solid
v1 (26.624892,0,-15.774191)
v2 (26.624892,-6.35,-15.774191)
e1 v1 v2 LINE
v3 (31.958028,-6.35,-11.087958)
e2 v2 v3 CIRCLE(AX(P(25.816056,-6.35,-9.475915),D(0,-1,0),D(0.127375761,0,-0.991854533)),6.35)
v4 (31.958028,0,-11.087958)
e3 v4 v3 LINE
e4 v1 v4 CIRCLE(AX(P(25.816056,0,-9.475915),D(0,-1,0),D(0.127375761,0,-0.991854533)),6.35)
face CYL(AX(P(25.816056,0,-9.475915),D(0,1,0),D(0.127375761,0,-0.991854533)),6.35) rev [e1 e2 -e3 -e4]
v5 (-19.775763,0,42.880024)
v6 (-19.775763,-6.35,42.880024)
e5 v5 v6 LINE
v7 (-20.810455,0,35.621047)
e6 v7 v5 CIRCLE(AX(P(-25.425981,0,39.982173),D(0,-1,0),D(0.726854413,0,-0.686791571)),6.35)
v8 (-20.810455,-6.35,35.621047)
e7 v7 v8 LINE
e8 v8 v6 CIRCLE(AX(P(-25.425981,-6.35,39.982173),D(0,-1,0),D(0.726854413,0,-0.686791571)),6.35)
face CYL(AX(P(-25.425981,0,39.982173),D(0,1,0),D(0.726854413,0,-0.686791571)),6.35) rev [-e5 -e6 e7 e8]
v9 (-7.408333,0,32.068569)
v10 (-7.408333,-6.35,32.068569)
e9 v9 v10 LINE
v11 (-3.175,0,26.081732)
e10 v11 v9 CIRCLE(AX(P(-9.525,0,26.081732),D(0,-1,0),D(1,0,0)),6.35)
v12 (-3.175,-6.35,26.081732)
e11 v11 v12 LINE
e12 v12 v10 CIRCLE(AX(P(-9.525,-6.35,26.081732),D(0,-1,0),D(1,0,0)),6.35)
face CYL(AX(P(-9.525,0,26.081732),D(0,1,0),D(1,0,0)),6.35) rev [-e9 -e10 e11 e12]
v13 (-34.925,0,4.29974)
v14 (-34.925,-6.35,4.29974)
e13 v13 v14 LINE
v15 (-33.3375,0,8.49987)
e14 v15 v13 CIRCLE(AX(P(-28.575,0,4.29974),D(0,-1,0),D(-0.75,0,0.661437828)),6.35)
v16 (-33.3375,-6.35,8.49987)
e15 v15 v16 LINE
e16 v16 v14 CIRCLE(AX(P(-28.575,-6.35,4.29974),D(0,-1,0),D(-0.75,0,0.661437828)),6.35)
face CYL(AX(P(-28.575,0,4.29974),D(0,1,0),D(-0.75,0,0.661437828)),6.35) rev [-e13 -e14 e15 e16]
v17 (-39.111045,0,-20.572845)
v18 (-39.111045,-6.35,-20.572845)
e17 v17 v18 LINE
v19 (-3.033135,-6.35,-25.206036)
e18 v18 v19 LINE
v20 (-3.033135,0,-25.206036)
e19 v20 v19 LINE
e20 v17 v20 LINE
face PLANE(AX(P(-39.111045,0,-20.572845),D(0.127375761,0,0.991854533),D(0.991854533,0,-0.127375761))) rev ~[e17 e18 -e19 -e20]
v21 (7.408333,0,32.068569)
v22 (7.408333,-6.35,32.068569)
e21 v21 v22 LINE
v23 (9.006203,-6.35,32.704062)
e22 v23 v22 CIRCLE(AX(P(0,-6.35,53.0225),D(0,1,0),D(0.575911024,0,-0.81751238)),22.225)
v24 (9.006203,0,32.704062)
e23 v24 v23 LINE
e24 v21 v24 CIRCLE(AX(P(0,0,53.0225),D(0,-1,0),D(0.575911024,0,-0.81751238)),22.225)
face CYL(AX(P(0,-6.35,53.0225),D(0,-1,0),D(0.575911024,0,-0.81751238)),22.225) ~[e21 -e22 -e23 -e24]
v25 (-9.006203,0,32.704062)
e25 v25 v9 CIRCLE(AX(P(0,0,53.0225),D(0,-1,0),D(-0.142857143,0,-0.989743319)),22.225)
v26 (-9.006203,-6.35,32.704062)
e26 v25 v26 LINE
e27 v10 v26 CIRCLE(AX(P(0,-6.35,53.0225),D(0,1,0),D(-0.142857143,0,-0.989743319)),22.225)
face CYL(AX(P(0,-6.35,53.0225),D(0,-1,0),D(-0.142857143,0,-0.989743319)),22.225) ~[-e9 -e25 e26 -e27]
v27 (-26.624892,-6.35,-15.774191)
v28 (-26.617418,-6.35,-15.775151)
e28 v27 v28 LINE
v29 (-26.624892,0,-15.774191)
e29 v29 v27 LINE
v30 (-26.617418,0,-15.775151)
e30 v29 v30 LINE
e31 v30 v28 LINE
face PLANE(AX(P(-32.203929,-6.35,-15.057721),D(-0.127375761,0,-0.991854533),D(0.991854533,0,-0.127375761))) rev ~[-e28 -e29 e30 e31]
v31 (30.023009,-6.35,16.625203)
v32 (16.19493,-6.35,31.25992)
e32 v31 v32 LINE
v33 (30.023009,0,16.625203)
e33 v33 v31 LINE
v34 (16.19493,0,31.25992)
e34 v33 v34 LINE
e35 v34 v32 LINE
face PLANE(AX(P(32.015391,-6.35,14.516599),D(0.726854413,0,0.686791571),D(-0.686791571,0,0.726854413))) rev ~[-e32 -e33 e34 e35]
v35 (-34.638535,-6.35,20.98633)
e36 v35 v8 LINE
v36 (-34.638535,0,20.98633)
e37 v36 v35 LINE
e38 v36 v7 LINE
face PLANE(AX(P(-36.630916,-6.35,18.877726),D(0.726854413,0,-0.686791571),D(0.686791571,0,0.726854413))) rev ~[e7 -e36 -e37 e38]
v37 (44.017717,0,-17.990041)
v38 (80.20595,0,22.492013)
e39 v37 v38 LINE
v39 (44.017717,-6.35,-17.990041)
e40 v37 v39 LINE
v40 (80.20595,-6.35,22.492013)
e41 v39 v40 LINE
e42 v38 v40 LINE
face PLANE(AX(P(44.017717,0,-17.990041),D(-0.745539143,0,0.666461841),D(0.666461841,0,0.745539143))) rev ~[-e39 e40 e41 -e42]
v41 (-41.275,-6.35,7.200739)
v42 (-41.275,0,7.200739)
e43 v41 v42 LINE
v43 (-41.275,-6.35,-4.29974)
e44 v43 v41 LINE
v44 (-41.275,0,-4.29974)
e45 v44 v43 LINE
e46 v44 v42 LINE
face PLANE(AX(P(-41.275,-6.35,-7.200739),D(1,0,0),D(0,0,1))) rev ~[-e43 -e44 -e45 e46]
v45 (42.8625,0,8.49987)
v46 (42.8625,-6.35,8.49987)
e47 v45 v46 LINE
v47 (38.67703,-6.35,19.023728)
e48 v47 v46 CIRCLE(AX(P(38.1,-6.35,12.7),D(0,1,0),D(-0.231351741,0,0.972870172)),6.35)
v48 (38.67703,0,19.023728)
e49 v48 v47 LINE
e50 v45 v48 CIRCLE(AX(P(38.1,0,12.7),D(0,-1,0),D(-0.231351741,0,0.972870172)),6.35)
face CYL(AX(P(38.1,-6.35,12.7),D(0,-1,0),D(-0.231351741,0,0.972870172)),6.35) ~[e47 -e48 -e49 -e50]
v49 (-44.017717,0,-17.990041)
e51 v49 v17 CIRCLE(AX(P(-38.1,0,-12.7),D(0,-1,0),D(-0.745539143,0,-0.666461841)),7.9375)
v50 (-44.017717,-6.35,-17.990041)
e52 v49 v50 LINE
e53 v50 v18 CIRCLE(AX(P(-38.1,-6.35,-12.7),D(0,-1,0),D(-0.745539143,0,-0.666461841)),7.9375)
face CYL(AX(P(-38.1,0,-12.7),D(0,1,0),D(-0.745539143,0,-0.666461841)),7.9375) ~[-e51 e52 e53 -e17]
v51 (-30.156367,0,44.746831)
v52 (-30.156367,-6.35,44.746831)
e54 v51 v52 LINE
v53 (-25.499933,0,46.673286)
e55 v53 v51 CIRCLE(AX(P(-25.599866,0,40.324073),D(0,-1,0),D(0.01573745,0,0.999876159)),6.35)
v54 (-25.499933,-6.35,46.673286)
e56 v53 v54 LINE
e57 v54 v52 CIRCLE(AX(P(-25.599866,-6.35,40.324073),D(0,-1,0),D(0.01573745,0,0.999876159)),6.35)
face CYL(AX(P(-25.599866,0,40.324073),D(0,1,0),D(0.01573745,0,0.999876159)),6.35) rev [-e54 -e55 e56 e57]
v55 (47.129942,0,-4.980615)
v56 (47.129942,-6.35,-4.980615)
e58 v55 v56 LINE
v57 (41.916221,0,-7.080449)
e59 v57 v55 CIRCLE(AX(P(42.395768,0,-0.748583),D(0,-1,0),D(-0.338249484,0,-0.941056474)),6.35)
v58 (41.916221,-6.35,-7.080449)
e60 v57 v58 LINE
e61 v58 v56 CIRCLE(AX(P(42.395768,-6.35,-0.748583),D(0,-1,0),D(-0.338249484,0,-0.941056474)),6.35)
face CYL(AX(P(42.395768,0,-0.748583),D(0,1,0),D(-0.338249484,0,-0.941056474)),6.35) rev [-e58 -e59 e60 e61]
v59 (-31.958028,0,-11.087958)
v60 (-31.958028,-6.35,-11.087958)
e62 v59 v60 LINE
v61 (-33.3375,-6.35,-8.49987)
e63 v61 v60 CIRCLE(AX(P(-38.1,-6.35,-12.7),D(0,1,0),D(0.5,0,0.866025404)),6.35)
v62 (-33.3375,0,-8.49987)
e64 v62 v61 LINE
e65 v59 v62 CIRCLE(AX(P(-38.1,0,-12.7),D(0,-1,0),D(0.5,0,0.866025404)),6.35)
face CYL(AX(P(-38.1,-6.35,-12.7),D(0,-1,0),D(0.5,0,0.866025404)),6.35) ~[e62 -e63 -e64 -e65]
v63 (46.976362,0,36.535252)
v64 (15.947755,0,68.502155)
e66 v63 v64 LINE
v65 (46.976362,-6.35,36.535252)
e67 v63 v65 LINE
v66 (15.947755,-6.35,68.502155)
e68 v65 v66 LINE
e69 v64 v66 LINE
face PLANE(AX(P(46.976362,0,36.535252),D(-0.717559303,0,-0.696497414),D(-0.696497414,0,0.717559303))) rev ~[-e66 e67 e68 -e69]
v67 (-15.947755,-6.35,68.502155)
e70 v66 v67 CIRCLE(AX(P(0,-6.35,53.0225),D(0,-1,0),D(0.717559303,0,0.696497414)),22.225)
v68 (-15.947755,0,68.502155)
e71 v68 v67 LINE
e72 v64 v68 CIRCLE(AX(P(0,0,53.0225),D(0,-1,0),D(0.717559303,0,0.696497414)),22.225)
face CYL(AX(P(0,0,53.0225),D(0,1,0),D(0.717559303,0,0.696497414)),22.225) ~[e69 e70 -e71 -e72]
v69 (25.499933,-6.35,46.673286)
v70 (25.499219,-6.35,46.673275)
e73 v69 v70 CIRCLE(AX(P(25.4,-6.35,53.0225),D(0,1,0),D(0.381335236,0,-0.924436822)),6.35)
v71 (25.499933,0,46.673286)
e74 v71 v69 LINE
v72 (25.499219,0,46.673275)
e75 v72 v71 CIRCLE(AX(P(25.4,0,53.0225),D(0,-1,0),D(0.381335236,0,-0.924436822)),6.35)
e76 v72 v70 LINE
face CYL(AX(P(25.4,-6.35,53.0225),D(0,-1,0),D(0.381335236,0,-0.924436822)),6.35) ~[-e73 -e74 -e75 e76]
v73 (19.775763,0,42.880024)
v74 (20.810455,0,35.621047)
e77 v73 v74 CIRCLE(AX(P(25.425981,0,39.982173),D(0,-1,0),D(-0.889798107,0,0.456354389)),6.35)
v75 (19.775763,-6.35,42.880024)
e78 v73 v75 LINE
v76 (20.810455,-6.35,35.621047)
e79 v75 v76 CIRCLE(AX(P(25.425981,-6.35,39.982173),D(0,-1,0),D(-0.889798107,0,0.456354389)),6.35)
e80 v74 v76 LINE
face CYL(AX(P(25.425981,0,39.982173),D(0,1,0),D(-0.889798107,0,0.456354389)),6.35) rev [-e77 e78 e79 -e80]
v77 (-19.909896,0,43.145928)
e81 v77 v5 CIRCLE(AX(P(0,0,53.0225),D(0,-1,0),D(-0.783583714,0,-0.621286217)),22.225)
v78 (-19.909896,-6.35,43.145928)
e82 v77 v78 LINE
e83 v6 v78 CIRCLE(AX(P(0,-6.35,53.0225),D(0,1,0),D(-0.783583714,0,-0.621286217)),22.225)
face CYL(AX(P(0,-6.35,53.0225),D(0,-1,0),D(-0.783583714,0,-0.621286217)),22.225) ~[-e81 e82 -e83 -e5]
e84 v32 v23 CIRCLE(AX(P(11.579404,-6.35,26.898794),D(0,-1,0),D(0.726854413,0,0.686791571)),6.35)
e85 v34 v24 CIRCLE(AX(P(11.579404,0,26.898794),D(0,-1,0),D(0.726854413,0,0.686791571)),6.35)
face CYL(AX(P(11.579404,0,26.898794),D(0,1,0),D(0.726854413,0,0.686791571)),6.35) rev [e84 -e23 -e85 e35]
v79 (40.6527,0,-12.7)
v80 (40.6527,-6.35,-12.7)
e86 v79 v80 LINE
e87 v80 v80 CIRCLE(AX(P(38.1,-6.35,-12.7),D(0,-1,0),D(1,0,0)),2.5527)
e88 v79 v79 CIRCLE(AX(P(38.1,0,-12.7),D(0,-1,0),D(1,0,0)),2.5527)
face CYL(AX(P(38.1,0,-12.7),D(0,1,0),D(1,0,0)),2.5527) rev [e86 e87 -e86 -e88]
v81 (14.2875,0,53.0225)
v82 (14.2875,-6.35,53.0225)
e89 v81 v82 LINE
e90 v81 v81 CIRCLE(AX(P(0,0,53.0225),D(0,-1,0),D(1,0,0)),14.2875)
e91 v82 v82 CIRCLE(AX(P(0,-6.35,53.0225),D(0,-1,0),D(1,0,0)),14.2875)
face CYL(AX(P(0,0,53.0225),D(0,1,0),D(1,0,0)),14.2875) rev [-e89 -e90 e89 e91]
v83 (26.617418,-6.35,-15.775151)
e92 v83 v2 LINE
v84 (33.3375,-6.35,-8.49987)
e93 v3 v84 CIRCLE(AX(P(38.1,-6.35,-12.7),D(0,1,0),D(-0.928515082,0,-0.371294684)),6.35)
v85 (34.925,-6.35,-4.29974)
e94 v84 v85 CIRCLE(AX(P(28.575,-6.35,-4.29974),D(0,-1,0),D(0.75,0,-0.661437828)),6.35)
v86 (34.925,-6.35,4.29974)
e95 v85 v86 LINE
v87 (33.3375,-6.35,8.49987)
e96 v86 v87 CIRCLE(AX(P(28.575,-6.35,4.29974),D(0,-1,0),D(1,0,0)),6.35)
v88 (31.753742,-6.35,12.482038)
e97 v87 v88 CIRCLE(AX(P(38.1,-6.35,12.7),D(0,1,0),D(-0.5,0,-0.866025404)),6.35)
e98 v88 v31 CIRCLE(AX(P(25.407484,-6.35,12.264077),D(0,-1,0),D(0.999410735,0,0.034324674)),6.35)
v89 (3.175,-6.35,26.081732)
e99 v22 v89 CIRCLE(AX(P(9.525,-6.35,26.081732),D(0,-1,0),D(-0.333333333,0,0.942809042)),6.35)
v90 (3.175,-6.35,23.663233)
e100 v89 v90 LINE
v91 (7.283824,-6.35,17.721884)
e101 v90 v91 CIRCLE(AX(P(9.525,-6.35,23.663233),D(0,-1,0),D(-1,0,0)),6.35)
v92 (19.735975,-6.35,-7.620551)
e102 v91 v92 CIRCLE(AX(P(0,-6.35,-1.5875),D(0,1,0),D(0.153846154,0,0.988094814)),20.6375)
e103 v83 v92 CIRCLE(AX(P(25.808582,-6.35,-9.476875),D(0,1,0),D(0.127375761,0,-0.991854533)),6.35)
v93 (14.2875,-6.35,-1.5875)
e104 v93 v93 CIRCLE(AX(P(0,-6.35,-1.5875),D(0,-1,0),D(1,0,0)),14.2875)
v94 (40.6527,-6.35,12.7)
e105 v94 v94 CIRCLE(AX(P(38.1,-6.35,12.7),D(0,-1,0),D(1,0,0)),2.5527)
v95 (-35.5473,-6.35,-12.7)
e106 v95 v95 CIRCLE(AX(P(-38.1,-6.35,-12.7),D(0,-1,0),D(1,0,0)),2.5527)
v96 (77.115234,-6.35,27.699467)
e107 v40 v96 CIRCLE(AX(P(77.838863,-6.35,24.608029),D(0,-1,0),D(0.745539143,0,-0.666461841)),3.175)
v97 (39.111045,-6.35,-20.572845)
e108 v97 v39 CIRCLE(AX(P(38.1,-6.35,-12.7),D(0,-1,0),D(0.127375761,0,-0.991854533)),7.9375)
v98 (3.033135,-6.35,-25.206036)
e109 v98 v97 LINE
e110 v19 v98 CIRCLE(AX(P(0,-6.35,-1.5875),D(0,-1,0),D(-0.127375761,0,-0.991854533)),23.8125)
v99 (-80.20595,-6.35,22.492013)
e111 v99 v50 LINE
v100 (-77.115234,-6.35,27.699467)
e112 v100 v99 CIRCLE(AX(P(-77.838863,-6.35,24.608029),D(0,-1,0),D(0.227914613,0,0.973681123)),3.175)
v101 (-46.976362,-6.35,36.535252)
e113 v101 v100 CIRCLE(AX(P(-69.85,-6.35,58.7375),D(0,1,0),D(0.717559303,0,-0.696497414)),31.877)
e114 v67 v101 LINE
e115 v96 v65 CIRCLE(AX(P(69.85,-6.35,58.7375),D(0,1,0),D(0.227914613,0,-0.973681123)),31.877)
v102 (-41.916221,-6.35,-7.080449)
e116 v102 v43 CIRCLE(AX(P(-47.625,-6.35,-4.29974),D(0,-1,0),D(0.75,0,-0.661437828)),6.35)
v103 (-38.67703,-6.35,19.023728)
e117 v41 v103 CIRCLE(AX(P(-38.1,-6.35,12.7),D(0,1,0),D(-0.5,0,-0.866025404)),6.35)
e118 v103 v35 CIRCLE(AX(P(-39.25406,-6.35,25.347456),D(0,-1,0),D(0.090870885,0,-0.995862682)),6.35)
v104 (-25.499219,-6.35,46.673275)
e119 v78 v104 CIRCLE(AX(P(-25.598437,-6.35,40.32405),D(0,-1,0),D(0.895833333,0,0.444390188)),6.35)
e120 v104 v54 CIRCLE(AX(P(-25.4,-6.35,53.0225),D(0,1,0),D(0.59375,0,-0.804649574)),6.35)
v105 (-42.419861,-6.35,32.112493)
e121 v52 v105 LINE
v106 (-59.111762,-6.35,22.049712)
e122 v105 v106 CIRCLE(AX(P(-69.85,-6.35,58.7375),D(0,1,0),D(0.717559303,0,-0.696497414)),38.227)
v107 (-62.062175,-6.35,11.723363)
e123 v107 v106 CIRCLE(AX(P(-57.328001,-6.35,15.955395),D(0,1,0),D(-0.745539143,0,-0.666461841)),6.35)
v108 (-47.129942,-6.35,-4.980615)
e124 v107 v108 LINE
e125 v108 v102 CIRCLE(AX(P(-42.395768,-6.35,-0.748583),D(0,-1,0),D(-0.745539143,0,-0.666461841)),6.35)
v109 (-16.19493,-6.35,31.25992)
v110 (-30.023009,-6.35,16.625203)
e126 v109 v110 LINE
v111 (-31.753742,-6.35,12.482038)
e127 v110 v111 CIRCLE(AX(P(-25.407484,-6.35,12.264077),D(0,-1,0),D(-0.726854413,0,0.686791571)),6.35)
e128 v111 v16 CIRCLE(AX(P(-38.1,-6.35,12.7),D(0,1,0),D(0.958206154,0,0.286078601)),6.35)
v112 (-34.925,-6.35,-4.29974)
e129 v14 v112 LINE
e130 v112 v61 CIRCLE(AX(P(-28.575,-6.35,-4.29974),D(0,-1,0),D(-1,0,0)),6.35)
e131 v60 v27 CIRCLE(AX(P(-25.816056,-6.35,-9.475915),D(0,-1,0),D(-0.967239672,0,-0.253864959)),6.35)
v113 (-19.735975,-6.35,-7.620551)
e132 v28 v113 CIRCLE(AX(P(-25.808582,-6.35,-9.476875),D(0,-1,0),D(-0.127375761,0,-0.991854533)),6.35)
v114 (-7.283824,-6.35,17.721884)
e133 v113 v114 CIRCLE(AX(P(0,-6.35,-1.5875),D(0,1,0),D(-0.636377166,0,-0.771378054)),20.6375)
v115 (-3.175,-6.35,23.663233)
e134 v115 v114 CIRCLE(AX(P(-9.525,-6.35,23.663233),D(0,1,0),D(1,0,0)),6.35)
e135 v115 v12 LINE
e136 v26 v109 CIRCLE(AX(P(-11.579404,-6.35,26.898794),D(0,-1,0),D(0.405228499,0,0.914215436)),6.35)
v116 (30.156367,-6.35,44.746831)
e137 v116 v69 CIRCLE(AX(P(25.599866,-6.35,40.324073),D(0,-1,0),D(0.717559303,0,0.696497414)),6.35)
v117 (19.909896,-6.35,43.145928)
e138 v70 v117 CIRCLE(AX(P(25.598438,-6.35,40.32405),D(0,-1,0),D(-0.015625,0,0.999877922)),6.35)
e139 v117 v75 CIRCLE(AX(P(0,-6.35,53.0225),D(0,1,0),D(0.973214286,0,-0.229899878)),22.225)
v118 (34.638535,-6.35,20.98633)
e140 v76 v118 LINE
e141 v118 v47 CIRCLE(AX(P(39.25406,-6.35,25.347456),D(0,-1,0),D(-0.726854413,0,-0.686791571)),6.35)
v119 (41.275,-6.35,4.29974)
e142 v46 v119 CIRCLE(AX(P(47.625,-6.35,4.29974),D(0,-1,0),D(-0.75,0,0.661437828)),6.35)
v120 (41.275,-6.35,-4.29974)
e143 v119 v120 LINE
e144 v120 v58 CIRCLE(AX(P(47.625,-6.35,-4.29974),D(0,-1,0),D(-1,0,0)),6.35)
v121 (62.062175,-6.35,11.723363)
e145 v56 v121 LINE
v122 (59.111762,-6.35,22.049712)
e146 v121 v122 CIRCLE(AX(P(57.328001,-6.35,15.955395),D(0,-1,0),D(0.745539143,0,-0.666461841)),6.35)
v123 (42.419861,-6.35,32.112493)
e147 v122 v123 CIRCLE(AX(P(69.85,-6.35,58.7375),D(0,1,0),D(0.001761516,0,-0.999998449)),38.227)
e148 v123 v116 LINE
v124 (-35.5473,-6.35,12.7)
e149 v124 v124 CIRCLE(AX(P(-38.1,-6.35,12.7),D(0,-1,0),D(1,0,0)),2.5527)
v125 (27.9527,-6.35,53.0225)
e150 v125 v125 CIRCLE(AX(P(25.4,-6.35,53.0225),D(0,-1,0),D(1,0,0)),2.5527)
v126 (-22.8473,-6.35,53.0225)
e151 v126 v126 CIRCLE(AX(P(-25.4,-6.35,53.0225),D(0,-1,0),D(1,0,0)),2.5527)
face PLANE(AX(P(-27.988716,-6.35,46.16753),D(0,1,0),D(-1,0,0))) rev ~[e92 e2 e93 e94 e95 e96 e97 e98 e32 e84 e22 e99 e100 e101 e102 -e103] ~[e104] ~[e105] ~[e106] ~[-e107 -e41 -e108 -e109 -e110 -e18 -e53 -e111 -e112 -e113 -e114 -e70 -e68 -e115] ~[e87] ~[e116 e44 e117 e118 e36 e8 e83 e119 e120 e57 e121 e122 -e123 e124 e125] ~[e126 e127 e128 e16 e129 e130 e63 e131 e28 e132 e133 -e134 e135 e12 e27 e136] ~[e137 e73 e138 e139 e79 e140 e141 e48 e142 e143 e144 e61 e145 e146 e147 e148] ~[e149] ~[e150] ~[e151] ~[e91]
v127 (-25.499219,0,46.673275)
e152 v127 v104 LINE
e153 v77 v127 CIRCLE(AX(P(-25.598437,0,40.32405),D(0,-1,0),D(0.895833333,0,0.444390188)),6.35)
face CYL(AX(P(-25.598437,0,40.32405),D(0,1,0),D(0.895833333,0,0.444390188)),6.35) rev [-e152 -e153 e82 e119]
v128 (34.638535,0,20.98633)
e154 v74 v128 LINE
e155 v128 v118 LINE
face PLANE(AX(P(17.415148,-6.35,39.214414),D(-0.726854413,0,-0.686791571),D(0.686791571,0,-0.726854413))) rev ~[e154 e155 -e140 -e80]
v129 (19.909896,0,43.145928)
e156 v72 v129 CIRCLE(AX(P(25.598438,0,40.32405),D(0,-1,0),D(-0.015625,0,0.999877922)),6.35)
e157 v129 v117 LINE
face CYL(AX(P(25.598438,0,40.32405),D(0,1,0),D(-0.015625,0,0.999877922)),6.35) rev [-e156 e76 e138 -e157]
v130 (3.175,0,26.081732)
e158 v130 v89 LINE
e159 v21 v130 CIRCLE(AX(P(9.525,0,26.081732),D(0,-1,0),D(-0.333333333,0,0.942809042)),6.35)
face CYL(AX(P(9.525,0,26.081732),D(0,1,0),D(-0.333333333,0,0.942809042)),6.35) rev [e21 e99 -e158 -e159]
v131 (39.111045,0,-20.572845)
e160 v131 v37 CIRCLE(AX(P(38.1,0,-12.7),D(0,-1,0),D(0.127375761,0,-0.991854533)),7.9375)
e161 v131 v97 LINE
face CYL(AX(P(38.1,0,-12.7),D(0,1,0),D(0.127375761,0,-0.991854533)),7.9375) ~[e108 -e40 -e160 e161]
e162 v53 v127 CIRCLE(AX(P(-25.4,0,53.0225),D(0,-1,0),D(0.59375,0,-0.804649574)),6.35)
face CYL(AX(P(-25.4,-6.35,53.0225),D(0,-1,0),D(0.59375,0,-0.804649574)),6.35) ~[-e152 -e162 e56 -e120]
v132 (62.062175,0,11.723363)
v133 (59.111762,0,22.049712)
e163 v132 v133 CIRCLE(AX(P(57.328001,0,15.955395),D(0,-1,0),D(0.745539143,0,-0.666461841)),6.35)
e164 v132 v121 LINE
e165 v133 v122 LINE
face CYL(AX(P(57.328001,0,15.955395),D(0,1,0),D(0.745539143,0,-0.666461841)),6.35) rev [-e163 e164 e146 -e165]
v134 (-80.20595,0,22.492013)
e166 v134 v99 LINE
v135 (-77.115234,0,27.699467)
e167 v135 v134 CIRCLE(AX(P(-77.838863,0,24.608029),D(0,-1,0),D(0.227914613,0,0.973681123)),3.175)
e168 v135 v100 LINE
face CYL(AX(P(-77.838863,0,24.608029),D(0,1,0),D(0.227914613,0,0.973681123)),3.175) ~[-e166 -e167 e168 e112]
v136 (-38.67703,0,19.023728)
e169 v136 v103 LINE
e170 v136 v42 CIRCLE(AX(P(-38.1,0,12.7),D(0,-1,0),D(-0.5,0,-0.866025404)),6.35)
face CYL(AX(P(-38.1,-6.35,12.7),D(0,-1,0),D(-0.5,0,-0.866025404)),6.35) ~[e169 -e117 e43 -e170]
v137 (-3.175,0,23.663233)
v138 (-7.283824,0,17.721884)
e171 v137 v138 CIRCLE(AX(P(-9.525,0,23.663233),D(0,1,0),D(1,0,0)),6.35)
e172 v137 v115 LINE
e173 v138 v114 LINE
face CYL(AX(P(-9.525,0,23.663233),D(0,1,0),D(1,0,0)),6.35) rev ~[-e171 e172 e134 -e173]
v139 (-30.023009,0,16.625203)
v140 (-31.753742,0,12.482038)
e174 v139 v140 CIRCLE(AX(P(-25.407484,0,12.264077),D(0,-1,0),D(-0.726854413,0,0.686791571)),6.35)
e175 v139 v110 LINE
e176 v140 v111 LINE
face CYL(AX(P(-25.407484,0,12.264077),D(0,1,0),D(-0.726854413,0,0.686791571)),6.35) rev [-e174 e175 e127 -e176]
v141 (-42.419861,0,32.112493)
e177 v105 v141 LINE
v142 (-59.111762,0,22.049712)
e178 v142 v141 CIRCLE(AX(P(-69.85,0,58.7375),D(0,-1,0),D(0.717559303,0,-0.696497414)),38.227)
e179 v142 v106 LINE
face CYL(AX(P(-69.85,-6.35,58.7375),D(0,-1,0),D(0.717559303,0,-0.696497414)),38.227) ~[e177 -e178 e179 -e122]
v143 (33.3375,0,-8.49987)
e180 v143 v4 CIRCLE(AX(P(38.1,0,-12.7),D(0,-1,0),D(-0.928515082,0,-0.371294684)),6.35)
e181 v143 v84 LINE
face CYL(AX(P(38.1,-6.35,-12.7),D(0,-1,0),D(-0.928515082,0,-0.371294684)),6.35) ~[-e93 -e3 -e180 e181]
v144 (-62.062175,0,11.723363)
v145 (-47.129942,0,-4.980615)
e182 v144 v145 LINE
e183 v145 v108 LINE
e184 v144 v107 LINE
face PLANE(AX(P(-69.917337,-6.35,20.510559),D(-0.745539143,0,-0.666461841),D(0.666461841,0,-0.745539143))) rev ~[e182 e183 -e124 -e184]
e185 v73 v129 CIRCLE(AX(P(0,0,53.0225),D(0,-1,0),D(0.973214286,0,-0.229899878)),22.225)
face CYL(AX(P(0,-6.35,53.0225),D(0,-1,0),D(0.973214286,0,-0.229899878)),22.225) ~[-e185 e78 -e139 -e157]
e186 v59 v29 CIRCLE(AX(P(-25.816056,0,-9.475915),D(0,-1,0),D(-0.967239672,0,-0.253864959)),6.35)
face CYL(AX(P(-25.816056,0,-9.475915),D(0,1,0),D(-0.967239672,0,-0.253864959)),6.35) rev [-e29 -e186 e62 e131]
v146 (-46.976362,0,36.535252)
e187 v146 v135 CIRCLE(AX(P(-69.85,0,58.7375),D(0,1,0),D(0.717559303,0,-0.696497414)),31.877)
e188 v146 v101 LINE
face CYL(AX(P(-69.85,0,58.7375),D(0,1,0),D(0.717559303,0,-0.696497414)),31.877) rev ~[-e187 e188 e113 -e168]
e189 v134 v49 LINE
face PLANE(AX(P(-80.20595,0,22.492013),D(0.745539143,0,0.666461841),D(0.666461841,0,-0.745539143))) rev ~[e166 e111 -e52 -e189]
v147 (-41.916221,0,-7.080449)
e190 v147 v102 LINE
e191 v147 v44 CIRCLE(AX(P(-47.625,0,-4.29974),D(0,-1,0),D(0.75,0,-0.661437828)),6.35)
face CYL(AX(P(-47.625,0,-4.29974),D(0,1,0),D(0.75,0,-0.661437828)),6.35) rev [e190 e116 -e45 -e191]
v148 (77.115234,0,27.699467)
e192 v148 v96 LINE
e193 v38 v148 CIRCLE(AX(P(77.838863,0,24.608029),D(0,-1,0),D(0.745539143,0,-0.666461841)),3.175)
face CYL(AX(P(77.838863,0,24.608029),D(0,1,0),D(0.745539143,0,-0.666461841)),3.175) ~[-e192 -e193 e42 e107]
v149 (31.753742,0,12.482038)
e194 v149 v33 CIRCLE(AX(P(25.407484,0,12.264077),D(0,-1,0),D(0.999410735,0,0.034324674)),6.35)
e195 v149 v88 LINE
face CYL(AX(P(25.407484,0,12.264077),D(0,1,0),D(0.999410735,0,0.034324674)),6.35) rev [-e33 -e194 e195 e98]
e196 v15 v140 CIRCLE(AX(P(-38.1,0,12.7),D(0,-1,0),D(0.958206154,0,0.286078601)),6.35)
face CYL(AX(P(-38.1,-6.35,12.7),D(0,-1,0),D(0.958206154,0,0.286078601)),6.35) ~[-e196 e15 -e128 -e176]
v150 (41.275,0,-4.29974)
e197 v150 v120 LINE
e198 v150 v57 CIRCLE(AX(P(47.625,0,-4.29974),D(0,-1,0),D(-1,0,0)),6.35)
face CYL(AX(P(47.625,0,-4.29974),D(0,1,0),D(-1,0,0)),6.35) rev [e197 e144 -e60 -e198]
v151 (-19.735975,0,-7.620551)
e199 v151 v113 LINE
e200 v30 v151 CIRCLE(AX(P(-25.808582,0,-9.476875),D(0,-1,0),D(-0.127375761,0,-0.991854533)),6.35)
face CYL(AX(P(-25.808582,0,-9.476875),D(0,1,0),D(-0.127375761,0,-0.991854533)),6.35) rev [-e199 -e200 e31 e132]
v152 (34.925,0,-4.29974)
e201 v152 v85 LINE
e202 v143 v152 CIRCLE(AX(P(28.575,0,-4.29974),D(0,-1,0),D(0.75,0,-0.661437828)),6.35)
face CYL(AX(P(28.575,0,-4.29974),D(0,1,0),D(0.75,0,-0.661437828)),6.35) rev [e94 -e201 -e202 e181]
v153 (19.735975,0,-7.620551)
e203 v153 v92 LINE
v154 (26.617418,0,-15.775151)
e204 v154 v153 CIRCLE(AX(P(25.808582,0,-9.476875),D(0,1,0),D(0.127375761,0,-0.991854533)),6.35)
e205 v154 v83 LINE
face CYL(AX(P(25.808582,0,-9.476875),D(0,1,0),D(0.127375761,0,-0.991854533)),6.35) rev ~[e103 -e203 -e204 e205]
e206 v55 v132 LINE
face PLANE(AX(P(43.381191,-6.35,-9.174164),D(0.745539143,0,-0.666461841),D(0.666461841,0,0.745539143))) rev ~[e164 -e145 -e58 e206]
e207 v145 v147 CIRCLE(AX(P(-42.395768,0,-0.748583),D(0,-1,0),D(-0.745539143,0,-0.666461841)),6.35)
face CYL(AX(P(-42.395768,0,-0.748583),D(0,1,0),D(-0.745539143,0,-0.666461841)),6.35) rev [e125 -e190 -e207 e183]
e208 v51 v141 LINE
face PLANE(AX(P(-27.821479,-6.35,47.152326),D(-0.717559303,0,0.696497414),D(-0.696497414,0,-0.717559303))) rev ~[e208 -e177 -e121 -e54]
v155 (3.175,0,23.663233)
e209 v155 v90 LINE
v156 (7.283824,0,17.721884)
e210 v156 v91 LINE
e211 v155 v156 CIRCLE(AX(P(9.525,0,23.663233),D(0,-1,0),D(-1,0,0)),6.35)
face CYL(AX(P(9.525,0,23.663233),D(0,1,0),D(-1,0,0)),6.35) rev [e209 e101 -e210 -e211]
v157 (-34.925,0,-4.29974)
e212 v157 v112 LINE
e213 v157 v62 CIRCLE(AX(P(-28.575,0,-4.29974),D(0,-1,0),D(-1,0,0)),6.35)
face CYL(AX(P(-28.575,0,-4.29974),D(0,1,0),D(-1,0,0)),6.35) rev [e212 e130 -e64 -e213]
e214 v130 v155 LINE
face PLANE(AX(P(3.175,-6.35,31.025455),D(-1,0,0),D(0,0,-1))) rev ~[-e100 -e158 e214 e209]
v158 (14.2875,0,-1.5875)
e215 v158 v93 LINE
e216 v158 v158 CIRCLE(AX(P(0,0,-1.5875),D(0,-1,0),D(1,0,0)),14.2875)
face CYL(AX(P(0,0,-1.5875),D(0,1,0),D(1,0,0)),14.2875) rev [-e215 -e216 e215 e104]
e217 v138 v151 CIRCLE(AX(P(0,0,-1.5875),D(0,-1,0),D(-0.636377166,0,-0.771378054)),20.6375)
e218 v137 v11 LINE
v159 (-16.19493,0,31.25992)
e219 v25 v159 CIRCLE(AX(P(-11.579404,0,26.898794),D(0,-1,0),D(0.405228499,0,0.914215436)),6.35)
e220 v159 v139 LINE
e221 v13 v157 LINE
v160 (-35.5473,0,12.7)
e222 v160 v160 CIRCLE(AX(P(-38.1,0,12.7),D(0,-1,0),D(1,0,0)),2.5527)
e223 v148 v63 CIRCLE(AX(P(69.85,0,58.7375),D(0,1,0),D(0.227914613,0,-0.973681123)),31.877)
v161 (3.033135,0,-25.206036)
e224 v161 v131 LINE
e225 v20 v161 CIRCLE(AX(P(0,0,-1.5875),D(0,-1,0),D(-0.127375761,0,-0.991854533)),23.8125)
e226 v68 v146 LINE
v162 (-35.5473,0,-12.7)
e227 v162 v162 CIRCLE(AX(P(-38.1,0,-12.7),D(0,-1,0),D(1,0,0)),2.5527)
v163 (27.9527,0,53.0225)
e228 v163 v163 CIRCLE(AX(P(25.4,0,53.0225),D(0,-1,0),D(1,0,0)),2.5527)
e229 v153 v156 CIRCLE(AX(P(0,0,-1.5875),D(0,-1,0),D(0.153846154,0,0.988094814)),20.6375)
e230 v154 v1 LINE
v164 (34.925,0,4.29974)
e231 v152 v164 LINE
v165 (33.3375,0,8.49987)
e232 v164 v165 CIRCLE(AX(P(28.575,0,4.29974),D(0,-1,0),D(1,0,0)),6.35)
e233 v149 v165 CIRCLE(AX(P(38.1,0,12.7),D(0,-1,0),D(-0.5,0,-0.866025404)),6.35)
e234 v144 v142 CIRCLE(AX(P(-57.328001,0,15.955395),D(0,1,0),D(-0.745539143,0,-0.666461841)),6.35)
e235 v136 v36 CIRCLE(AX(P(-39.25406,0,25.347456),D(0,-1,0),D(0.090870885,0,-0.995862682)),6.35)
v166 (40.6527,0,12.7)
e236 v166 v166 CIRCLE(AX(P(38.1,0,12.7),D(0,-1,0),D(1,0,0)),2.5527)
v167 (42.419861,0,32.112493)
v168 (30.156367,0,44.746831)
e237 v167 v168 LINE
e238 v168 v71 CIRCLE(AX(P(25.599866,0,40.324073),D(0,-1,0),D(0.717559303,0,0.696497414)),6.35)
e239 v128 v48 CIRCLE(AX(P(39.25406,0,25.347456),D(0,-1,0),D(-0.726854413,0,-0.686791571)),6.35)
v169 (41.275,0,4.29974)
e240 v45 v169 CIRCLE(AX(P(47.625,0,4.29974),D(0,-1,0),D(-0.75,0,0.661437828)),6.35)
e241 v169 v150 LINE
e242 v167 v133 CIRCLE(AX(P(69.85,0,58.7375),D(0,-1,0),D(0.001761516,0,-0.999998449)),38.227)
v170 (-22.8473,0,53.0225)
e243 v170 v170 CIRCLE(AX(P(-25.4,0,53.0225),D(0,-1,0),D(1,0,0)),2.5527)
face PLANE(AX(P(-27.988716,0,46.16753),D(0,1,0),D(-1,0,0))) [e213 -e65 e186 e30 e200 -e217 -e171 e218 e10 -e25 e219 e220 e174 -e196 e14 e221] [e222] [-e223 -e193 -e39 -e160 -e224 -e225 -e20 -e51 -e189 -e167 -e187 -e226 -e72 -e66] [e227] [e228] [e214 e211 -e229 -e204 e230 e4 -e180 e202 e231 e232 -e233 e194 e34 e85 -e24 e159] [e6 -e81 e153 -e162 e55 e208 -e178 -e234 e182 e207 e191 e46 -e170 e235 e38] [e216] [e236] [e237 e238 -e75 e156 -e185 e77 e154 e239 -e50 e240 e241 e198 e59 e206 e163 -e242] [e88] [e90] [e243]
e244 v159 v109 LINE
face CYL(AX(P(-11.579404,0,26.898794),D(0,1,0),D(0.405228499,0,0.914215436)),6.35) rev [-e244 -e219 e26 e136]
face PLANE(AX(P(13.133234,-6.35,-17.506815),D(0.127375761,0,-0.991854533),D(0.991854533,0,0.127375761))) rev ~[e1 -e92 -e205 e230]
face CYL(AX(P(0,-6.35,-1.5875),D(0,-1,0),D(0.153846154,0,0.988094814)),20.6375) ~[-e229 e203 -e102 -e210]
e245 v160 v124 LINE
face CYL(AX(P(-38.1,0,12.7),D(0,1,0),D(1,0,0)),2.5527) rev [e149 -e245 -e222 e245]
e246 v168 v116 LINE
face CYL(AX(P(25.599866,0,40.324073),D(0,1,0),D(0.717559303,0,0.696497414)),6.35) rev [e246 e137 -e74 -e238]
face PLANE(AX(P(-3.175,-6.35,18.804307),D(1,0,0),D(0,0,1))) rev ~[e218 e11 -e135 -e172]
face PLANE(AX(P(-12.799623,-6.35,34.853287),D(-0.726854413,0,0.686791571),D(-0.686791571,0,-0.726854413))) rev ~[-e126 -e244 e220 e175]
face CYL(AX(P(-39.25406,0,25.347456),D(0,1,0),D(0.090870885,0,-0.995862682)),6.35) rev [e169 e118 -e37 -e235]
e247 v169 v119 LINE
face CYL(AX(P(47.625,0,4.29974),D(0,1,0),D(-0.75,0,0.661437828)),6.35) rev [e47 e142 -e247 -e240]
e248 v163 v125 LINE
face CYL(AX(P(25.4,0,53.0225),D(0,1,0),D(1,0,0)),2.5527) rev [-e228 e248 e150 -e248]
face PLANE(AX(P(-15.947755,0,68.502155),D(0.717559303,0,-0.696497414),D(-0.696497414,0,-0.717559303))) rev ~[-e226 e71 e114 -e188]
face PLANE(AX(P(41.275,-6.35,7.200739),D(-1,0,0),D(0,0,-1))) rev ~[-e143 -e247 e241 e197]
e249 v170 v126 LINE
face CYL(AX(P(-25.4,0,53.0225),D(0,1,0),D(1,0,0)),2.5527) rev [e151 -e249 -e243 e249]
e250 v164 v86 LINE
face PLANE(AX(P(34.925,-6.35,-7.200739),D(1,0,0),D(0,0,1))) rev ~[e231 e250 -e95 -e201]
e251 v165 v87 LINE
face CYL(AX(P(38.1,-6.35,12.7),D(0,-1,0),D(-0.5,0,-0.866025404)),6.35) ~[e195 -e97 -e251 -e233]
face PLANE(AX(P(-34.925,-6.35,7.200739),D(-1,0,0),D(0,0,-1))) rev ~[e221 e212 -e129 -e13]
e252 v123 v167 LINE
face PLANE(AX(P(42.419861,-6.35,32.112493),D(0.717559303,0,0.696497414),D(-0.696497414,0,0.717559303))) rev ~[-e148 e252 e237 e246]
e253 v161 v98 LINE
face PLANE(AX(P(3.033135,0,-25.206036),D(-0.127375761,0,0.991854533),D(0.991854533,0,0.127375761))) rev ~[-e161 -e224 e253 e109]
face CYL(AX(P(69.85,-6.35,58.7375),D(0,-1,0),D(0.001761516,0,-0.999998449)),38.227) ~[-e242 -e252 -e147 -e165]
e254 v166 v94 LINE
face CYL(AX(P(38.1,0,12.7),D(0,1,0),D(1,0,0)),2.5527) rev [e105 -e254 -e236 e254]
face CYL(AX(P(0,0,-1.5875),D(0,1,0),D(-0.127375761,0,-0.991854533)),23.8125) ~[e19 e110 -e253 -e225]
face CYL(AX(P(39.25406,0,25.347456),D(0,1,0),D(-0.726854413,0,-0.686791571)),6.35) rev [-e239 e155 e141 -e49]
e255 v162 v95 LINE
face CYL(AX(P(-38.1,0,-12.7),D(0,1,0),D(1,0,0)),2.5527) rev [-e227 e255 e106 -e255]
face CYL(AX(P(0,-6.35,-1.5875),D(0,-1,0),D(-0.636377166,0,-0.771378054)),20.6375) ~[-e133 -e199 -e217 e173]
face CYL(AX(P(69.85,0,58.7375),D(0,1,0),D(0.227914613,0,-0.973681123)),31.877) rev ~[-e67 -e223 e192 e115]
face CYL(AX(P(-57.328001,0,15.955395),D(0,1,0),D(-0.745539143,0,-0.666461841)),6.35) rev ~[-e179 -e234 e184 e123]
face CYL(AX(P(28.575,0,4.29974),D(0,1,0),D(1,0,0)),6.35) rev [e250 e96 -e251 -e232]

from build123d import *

# Parameters (mm, degrees)
F0_R        = 2.5527
F0_R_2      = 14.2875
F1_DEPTH    = 6.35
F3_DEPTH    = 25.4
F4_T1_DEPTH = 6.35


# Not quite as in the source:
# - a fillet or chamfer that OpenCascade refuses, or shapes differently, is made with other operations: its cross-section is extruded or revolved along the edge and cut away or added


with BuildPart() as f1:
    # F0 (on Front) → F1 (new body)
    with BuildSketch(Plane.XZ):
        with BuildLine():
            ThreePointArc((-3.0331353108, -25.2060360773), (0, -25.4), (3.0331353108, -25.2060360773))
            Line((3.0331353108, -25.2060360773), (39.1110451036, -20.5728453591))
            ThreePointArc((39.1110451036, -20.5728453591), (41.7972497423, -19.7238344651), (44.0177169487, -17.9900408661))
            Line((44.0177169487, -17.9900408661), (80.2059498117, 22.4920129361))
            ThreePointArc((80.2059498117, 22.4920129361), (80.5691803237, 26.2285207166), (77.1152341344, 27.6994668475))
            ThreePointArc((77.1152341344, 27.6994668475), (60.8820938076, 28.1479627769), (46.9763621139, 36.5352519414))
            Line((46.9763621139, 36.5352519414), (15.9477554983, 68.5021550209))
            ThreePointArc((15.9477554983, 68.5021550209), (0, 75.2475), (-15.9477554983, 68.5021550209))
            Line((-15.9477554983, 68.5021550209), (-46.9763621139, 36.5352519414))
            ThreePointArc((-46.9763621139, 36.5352519414), (-60.8820938076, 28.1479627769), (-77.1152341344, 27.6994668475))
            ThreePointArc((-77.1152341344, 27.6994668475), (-80.5691803237, 26.2285207166), (-80.2059498117, 22.4920129361))
            Line((-80.2059498117, 22.4920129361), (-44.0177169487, -17.9900408661))
            ThreePointArc((-44.0177169487, -17.9900408661), (-41.7972497423, -19.7238344651), (-39.1110451036, -20.5728453591))
            Line((-39.1110451036, -20.5728453591), (-3.0331353108, -25.2060360773))
        make_face()
        with Locations((-38.1, -12.7)):
            Circle(F0_R, mode=Mode.SUBTRACT)
        with Locations((0, -1.5875)):
            Circle(F0_R_2, mode=Mode.SUBTRACT)
        with Locations((-38.1, 12.7)):
            Circle(F0_R, mode=Mode.SUBTRACT)
        with Locations((38.1, -12.7)):
            Circle(F0_R, mode=Mode.SUBTRACT)
        with Locations((38.1, 12.7)):
            Circle(F0_R, mode=Mode.SUBTRACT)
        with Locations((-25.4, 53.0225)):
            Circle(F0_R, mode=Mode.SUBTRACT)
        with Locations((0, 53.0225)):
            Circle(F0_R_2, mode=Mode.SUBTRACT)
        with Locations((25.4, 53.0225)):
            Circle(F0_R, mode=Mode.SUBTRACT)
    extrude(amount=F1_DEPTH)

    # F2 (on face) → F3 (cut)
    with BuildSketch(Plane.XZ.offset(6.35)):
        with BuildLine():
            ThreePointArc((-43.3811914248, -9.1741643352), (-42.441704222, -8.0661997833), (-41.275, -7.200738686))
            Line((-41.275, -7.200738686), (-41.275, 7.200738686))
            ThreePointArc((-41.275, 7.200738686), (-44.0004697722, 15.046690535), (-36.6309164423, 18.8777255929))
            Line((-36.6309164423, 18.8777255929), (-17.4151480361, 39.2144138227))
            ThreePointArc((-17.4151480361, 39.2144138227), (-20.0010259245, 43.331804103), (-21.6296875, 47.9129752029))
            ThreePointArc((-21.6296875, 47.9129752029), (-24.6257359251, 46.7198802953), (-27.8214787465, 47.1523261797))
            Line((-27.8214787465, 47.1523261797), (-42.4198605429, 32.112493364))
            ThreePointArc((-42.4198605429, 32.112493364), (-54.9895844041, 23.5171709652), (-69.9173374643, 20.510559308))
            Line((-69.9173374643, 20.510559308), (-43.3811914248, -9.1741643352))
        make_face()
        with BuildLine():
            Line((-34.925, 7.200738686), (-34.925, -7.200738686))
            ThreePointArc((-34.925, -7.200738686), (-32.0996562634, -10.6219299715), (-32.2039292281, -15.0577212415))
            Line((-32.2039292281, -15.0577212415), (-13.1332337576, -17.5068145995))
            ThreePointArc((-13.1332337576, -17.5068145995), (-19.9026130173, 3.870741597), (-3.175, 18.8043067186))
            Line((-3.175, 18.8043067186), (-3.175, 31.0254547439))
            ThreePointArc((-3.175, 31.0254547439), (-8.2134168725, 32.3708557972), (-12.799622514, 34.8532873451))
            Line((-12.799622514, 34.8532873451), (-32.0153909201, 14.5165991152))
            ThreePointArc((-32.0153909201, 14.5165991152), (-32.1995302278, 10.353309465), (-34.925, 7.200738686))
        make_face()
        with BuildLine():
            Line((41.275, 7.200738686), (41.275, -7.200738686))
            ThreePointArc((41.275, -7.200738686), (42.441704222, -8.0661997833), (43.3811914248, -9.1741643352))
            Line((43.3811914248, -9.1741643352), (69.9173374643, 20.510559308))
            ThreePointArc((69.9173374643, 20.510559308), (54.9895844041, 23.5171709652), (42.4198605429, 32.112493364))
            Line((42.4198605429, 32.112493364), (27.8214787465, 47.1523261797))
            ThreePointArc((27.8214787465, 47.1523261797), (24.6257359251, 46.7198802953), (21.6296875, 47.9129752029))
            ThreePointArc((21.6296875, 47.9129752029), (20.0010259245, 43.331804103), (17.4151480361, 39.2144138227))
            Line((17.4151480361, 39.2144138227), (36.6309164423, 18.8777255929))
            ThreePointArc((36.6309164423, 18.8777255929), (44.0004697722, 15.046690535), (41.275, 7.200738686))
        make_face()
        with BuildLine():
            Line((13.1332337576, -17.5068145995), (32.2039292281, -15.0577212415))
            ThreePointArc((32.2039292281, -15.0577212415), (32.0996562634, -10.6219299715), (34.925, -7.200738686))
            Line((34.925, -7.200738686), (34.925, 7.200738686))
            ThreePointArc((34.925, 7.200738686), (32.1995302278, 10.353309465), (32.0153909201, 14.5165991152))
            Line((32.0153909201, 14.5165991152), (12.799622514, 34.8532873451))
            ThreePointArc((12.799622514, 34.8532873451), (8.2134168725, 32.3708557972), (3.175, 31.0254547439))
            Line((3.175, 31.0254547439), (3.175, 18.8043067186))
            ThreePointArc((3.175, 18.8043067186), (19.9026130173, 3.870741597), (13.1332337576, -17.5068145995))
        make_face()
    extrude(amount=-F3_DEPTH, mode=Mode.SUBTRACT)

    # F4: fillet of radius 6.35 on 31 edges, made by hand

    # F4_s2 → F4_t1 (join)
    with BuildSketch(Plane.XZ):
        with BuildLine():
            ThreePointArc((-25.4999328069, 46.6732863925), (-28.0274278752, 46.1917334318), (-30.1563671847, 44.7468313623))
            Line((-30.1563671847, 44.7468313623), (-27.8214787465, 47.1523261797))
            ThreePointArc((-27.8214787465, 47.1523261797), (-26.6832571196, 46.8035168705), (-25.4999328069, 46.6732863925))
        make_face()
        with BuildLine():
            ThreePointArc((-19.9098958333, 43.1459280792), (-22.2094720123, 45.6940981456), (-25.49921875, 46.6732751938))
            ThreePointArc((-25.49921875, 46.6732751938), (-23.4626186853, 46.9752647936), (-21.6296875, 47.9129752029))
            ThreePointArc((-21.6296875, 47.9129752029), (-20.9061098832, 45.4802725735), (-19.9098958333, 43.1459280792))
        make_face()
        with BuildLine():
            ThreePointArc((-20.8104553969, 35.621046866), (-19.1395225651, 39.0861033883), (-19.775762937, 42.8800237117))
            ThreePointArc((-19.775762937, 42.8800237117), (-18.6855596309, 40.9891926291), (-17.4151480361, 39.2144138227))
            Line((-17.4151480361, 39.2144138227), (-20.8104553969, 35.621046866))
        make_face()
        with BuildLine():
            ThreePointArc((-3.175, 23.6632332814), (-4.3022626627, 20.0513757668), (-7.2838235294, 17.721884274))
            ThreePointArc((-7.2838235294, 17.721884274), (-5.2573431495, 18.3691216895), (-3.175, 18.8043067186))
            Line((-3.175, 18.8043067186), (-3.175, 23.6632332814))
        make_face()
        with BuildLine():
            ThreePointArc((-38.6770301176, 19.0237280336), (-36.4785224973, 19.6361610946), (-34.6385347131, 20.9863295896))
            Line((-34.6385347131, 20.9863295896), (-36.6309164423, 18.8777255929))
            ThreePointArc((-36.6309164423, 18.8777255929), (-37.6480387039, 19.0338954038), (-38.6770301176, 19.0237280336))
        make_face()
        with BuildLine():
            ThreePointArc((-42.8625, -8.4998697937), (-41.6851188985, -6.5448036176), (-41.275, -4.2997395874))
            Line((-41.275, -4.2997395874), (-41.275, -7.200738686))
            ThreePointArc((-41.275, -7.200738686), (-42.1215559142, -7.7857769659), (-42.8625, -8.4998697937))
        make_face()
        with BuildLine():
            ThreePointArc((-47.1299420033, -4.9806154768), (-43.9553595951, -6.9040823934), (-40.2478842222, -6.724291392))
            ThreePointArc((-40.2478842222, -6.724291392), (-42.0112990938, -7.6975766474), (-43.3811914248, -9.1741643352))
            Line((-43.3811914248, -9.1741643352), (-47.1299420033, -4.9806154768))
        make_face()
        with BuildLine():
            ThreePointArc((-62.0621747984, 11.7233626833), (-63.433674019, 17.6998895462), (-59.1117617466, 22.0497122742))
            ThreePointArc((-59.1117617466, 22.0497122742), (-64.4593340972, 20.8924970257), (-69.9173374643, 20.510559308))
            Line((-69.9173374643, 20.510559308), (-62.0621747984, 11.7233626833))
        make_face()
        with BuildLine():
            ThreePointArc((-34.925, -4.2997395874), (-34.5148811015, -6.5448036176), (-33.3375, -8.4998697937))
            ThreePointArc((-33.3375, -8.4998697937), (-34.0784440858, -7.7857769659), (-34.925, -7.200738686))
            Line((-34.925, -7.200738686), (-34.925, -4.2997395874))
        make_face()
        with BuildLine():
            ThreePointArc((-33.3375, 8.4998697937), (-34.5148811015, 6.5448036176), (-34.925, 4.2997395874))
            Line((-34.925, 4.2997395874), (-34.925, 7.200738686))
            ThreePointArc((-34.925, 7.200738686), (-34.0784440858, 7.7857769659), (-33.3375, 8.4998697937))
        make_face()
        with BuildLine():
            ThreePointArc((-30.0230091909, 16.625203112), (-31.2668035127, 14.7117022115), (-31.7537418344, 12.4820383172))
            ThreePointArc((-31.7537418344, 12.4820383172), (-31.8018673776, 13.5099539932), (-32.0153909201, 14.5165991152))
            Line((-32.0153909201, 14.5165991152), (-30.0230091909, 16.625203112))
        make_face()
        with BuildLine():
            ThreePointArc((-31.9580280848, -11.087957509), (-30.0075511004, -14.2460167198), (-26.6248922524, -15.7741913054))
            Line((-26.6248922524, -15.7741913054), (-32.2039292281, -15.0577212415))
            ThreePointArc((-32.2039292281, -15.0577212415), (-31.762147528, -13.092588898), (-31.9580280848, -11.087957509))
        make_face()
        with BuildLine():
            ThreePointArc((3.175, 23.6632332814), (4.3022626627, 20.0513757668), (7.2838235294, 17.721884274))
            ThreePointArc((7.2838235294, 17.721884274), (5.2573431495, 18.3691216895), (3.175, 18.8043067186))
            Line((3.175, 18.8043067186), (3.175, 23.6632332814))
        make_face()
        with BuildLine():
            ThreePointArc((-26.6174183984, -15.7751511113), (-20.9556247606, -13.572152955), (-19.7359747119, -7.620551336))
            ThreePointArc((-19.7359747119, -7.620551336), (-17.161898691, -13.0494212861), (-13.1332337576, -17.5068145995))
            Line((-13.1332337576, -17.5068145995), (-26.6174183984, -15.7751511113))
        make_face()
        with BuildLine():
            ThreePointArc((26.6248922524, -15.7741913054), (30.0075511004, -14.2460167198), (31.9580280848, -11.087957509))
            ThreePointArc((31.9580280848, -11.087957509), (31.762147528, -13.092588898), (32.2039292281, -15.0577212415))
            Line((32.2039292281, -15.0577212415), (26.6248922524, -15.7741913054))
        make_face()
        with BuildLine():
            ThreePointArc((33.3375, -8.4998697937), (34.5148811015, -6.5448036176), (34.925, -4.2997395874))
            Line((34.925, -4.2997395874), (34.925, -7.200738686))
            ThreePointArc((34.925, -7.200738686), (34.0784440858, -7.7857769659), (33.3375, -8.4998697937))
        make_face()
        with BuildLine():
            ThreePointArc((26.6174183984, -15.7751511113), (20.9556247606, -13.572152955), (19.7359747119, -7.620551336))
            ThreePointArc((19.7359747119, -7.620551336), (17.161898691, -13.0494212861), (13.1332337576, -17.5068145995))
            Line((13.1332337576, -17.5068145995), (26.6174183984, -15.7751511113))
        make_face()
        with BuildLine():
            ThreePointArc((34.6385347131, 20.9863295896), (36.4785224973, 19.6361610946), (38.6770301176, 19.0237280336))
            ThreePointArc((38.6770301176, 19.0237280336), (37.6480387039, 19.0338954038), (36.6309164423, 18.8777255929))
            Line((36.6309164423, 18.8777255929), (34.6385347131, 20.9863295896))
        make_face()
        with BuildLine():
            ThreePointArc((42.8625, 8.4998697937), (41.6851188985, 6.5448036176), (41.275, 4.2997395874))
            Line((41.275, 4.2997395874), (41.275, 7.200738686))
            ThreePointArc((41.275, 7.200738686), (42.1215559142, 7.7857769659), (42.8625, 8.4998697937))
        make_face()
        with BuildLine():
            ThreePointArc((19.775762937, 42.8800237117), (19.1395225651, 39.0861033883), (20.8104553969, 35.621046866))
            Line((20.8104553969, 35.621046866), (17.4151480361, 39.2144138227))
            ThreePointArc((17.4151480361, 39.2144138227), (18.6855596309, 40.9891926291), (19.775762937, 42.8800237117))
        make_face()
        with BuildLine():
            ThreePointArc((-9.0062033853, 32.7040619305), (-12.8300676147, 33.1244136714), (-16.1949298747, 31.2599203883))
            Line((-16.1949298747, 31.2599203883), (-12.799622514, 34.8532873451))
            ThreePointArc((-12.799622514, 34.8532873451), (-10.955742935, 33.685428822), (-9.0062033853, 32.7040619305))
        make_face()
        with BuildLine():
            ThreePointArc((7.4083333333, 32.0685690508), (4.3402467111, 29.7479058461), (3.175, 26.0817316368))
            Line((3.175, 26.0817316368), (3.175, 31.0254547439))
            ThreePointArc((3.175, 31.0254547439), (5.317307399, 31.442952576), (7.4083333333, 32.0685690508))
        make_face()
        with BuildLine():
            ThreePointArc((-3.175, 26.0817316368), (-4.3402467111, 29.7479058461), (-7.4083333333, 32.0685690508))
            ThreePointArc((-7.4083333333, 32.0685690508), (-5.317307399, 31.442952576), (-3.175, 31.0254547439))
            Line((-3.175, 31.0254547439), (-3.175, 26.0817316368))
        make_face()
        with BuildLine():
            ThreePointArc((16.1949298747, 31.2599203883), (12.8300676147, 33.1244136714), (9.0062033853, 32.7040619305))
            ThreePointArc((9.0062033853, 32.7040619305), (10.955742935, 33.685428822), (12.799622514, 34.8532873451))
            Line((12.799622514, 34.8532873451), (16.1949298747, 31.2599203883))
        make_face()
        with BuildLine():
            ThreePointArc((31.7537418344, 12.4820383172), (31.2668035127, 14.7117022115), (30.0230091909, 16.625203112))
            Line((30.0230091909, 16.625203112), (32.0153909201, 14.5165991152))
            ThreePointArc((32.0153909201, 14.5165991152), (31.8018673776, 13.5099539932), (31.7537418344, 12.4820383172))
        make_face()
        with BuildLine():
            ThreePointArc((34.925, 4.2997395874), (34.5148811015, 6.5448036176), (33.3375, 8.4998697937))
            ThreePointArc((33.3375, 8.4998697937), (34.0784440858, 7.7857769659), (34.925, 7.200738686))
            Line((34.925, 7.200738686), (34.925, 4.2997395874))
        make_face()
        with BuildLine():
            ThreePointArc((62.0621747984, 11.7233626833), (63.433674019, 17.6998895462), (59.1117617466, 22.0497122742))
            ThreePointArc((59.1117617466, 22.0497122742), (64.4593340972, 20.8924970257), (69.9173374643, 20.510559308))
            Line((69.9173374643, 20.510559308), (62.0621747984, 11.7233626833))
        make_face()
        with BuildLine():
            ThreePointArc((25.49921875, 46.6732751938), (22.2094720123, 45.6940981456), (19.9098958333, 43.1459280792))
            ThreePointArc((19.9098958333, 43.1459280792), (20.9061098832, 45.4802725735), (21.6296875, 47.9129752029))
            ThreePointArc((21.6296875, 47.9129752029), (23.4626186853, 46.9752647936), (25.49921875, 46.6732751938))
        make_face()
        with BuildLine():
            ThreePointArc((30.1563671847, 44.7468313623), (28.0274278752, 46.1917334318), (25.4999328069, 46.6732863925))
            ThreePointArc((25.4999328069, 46.6732863925), (26.6832571196, 46.8035168705), (27.8214787465, 47.1523261797))
            Line((27.8214787465, 47.1523261797), (30.1563671847, 44.7468313623))
        make_face()
        with BuildLine():
            ThreePointArc((41.275, -4.2997395874), (41.6851188985, -6.5448036176), (42.8625, -8.4998697937))
            ThreePointArc((42.8625, -8.4998697937), (42.1215559142, -7.7857769659), (41.275, -7.200738686))
            Line((41.275, -7.200738686), (41.275, -4.2997395874))
        make_face()
        with BuildLine():
            ThreePointArc((40.2478842222, -6.724291392), (43.9553595951, -6.9040823934), (47.1299420033, -4.9806154768))
            Line((47.1299420033, -4.9806154768), (43.3811914248, -9.1741643352))
            ThreePointArc((43.3811914248, -9.1741643352), (42.0112990938, -7.6975766474), (40.2478842222, -6.724291392))
        make_face()
    extrude(amount=F4_T1_DEPTH)


solid = f1.part
